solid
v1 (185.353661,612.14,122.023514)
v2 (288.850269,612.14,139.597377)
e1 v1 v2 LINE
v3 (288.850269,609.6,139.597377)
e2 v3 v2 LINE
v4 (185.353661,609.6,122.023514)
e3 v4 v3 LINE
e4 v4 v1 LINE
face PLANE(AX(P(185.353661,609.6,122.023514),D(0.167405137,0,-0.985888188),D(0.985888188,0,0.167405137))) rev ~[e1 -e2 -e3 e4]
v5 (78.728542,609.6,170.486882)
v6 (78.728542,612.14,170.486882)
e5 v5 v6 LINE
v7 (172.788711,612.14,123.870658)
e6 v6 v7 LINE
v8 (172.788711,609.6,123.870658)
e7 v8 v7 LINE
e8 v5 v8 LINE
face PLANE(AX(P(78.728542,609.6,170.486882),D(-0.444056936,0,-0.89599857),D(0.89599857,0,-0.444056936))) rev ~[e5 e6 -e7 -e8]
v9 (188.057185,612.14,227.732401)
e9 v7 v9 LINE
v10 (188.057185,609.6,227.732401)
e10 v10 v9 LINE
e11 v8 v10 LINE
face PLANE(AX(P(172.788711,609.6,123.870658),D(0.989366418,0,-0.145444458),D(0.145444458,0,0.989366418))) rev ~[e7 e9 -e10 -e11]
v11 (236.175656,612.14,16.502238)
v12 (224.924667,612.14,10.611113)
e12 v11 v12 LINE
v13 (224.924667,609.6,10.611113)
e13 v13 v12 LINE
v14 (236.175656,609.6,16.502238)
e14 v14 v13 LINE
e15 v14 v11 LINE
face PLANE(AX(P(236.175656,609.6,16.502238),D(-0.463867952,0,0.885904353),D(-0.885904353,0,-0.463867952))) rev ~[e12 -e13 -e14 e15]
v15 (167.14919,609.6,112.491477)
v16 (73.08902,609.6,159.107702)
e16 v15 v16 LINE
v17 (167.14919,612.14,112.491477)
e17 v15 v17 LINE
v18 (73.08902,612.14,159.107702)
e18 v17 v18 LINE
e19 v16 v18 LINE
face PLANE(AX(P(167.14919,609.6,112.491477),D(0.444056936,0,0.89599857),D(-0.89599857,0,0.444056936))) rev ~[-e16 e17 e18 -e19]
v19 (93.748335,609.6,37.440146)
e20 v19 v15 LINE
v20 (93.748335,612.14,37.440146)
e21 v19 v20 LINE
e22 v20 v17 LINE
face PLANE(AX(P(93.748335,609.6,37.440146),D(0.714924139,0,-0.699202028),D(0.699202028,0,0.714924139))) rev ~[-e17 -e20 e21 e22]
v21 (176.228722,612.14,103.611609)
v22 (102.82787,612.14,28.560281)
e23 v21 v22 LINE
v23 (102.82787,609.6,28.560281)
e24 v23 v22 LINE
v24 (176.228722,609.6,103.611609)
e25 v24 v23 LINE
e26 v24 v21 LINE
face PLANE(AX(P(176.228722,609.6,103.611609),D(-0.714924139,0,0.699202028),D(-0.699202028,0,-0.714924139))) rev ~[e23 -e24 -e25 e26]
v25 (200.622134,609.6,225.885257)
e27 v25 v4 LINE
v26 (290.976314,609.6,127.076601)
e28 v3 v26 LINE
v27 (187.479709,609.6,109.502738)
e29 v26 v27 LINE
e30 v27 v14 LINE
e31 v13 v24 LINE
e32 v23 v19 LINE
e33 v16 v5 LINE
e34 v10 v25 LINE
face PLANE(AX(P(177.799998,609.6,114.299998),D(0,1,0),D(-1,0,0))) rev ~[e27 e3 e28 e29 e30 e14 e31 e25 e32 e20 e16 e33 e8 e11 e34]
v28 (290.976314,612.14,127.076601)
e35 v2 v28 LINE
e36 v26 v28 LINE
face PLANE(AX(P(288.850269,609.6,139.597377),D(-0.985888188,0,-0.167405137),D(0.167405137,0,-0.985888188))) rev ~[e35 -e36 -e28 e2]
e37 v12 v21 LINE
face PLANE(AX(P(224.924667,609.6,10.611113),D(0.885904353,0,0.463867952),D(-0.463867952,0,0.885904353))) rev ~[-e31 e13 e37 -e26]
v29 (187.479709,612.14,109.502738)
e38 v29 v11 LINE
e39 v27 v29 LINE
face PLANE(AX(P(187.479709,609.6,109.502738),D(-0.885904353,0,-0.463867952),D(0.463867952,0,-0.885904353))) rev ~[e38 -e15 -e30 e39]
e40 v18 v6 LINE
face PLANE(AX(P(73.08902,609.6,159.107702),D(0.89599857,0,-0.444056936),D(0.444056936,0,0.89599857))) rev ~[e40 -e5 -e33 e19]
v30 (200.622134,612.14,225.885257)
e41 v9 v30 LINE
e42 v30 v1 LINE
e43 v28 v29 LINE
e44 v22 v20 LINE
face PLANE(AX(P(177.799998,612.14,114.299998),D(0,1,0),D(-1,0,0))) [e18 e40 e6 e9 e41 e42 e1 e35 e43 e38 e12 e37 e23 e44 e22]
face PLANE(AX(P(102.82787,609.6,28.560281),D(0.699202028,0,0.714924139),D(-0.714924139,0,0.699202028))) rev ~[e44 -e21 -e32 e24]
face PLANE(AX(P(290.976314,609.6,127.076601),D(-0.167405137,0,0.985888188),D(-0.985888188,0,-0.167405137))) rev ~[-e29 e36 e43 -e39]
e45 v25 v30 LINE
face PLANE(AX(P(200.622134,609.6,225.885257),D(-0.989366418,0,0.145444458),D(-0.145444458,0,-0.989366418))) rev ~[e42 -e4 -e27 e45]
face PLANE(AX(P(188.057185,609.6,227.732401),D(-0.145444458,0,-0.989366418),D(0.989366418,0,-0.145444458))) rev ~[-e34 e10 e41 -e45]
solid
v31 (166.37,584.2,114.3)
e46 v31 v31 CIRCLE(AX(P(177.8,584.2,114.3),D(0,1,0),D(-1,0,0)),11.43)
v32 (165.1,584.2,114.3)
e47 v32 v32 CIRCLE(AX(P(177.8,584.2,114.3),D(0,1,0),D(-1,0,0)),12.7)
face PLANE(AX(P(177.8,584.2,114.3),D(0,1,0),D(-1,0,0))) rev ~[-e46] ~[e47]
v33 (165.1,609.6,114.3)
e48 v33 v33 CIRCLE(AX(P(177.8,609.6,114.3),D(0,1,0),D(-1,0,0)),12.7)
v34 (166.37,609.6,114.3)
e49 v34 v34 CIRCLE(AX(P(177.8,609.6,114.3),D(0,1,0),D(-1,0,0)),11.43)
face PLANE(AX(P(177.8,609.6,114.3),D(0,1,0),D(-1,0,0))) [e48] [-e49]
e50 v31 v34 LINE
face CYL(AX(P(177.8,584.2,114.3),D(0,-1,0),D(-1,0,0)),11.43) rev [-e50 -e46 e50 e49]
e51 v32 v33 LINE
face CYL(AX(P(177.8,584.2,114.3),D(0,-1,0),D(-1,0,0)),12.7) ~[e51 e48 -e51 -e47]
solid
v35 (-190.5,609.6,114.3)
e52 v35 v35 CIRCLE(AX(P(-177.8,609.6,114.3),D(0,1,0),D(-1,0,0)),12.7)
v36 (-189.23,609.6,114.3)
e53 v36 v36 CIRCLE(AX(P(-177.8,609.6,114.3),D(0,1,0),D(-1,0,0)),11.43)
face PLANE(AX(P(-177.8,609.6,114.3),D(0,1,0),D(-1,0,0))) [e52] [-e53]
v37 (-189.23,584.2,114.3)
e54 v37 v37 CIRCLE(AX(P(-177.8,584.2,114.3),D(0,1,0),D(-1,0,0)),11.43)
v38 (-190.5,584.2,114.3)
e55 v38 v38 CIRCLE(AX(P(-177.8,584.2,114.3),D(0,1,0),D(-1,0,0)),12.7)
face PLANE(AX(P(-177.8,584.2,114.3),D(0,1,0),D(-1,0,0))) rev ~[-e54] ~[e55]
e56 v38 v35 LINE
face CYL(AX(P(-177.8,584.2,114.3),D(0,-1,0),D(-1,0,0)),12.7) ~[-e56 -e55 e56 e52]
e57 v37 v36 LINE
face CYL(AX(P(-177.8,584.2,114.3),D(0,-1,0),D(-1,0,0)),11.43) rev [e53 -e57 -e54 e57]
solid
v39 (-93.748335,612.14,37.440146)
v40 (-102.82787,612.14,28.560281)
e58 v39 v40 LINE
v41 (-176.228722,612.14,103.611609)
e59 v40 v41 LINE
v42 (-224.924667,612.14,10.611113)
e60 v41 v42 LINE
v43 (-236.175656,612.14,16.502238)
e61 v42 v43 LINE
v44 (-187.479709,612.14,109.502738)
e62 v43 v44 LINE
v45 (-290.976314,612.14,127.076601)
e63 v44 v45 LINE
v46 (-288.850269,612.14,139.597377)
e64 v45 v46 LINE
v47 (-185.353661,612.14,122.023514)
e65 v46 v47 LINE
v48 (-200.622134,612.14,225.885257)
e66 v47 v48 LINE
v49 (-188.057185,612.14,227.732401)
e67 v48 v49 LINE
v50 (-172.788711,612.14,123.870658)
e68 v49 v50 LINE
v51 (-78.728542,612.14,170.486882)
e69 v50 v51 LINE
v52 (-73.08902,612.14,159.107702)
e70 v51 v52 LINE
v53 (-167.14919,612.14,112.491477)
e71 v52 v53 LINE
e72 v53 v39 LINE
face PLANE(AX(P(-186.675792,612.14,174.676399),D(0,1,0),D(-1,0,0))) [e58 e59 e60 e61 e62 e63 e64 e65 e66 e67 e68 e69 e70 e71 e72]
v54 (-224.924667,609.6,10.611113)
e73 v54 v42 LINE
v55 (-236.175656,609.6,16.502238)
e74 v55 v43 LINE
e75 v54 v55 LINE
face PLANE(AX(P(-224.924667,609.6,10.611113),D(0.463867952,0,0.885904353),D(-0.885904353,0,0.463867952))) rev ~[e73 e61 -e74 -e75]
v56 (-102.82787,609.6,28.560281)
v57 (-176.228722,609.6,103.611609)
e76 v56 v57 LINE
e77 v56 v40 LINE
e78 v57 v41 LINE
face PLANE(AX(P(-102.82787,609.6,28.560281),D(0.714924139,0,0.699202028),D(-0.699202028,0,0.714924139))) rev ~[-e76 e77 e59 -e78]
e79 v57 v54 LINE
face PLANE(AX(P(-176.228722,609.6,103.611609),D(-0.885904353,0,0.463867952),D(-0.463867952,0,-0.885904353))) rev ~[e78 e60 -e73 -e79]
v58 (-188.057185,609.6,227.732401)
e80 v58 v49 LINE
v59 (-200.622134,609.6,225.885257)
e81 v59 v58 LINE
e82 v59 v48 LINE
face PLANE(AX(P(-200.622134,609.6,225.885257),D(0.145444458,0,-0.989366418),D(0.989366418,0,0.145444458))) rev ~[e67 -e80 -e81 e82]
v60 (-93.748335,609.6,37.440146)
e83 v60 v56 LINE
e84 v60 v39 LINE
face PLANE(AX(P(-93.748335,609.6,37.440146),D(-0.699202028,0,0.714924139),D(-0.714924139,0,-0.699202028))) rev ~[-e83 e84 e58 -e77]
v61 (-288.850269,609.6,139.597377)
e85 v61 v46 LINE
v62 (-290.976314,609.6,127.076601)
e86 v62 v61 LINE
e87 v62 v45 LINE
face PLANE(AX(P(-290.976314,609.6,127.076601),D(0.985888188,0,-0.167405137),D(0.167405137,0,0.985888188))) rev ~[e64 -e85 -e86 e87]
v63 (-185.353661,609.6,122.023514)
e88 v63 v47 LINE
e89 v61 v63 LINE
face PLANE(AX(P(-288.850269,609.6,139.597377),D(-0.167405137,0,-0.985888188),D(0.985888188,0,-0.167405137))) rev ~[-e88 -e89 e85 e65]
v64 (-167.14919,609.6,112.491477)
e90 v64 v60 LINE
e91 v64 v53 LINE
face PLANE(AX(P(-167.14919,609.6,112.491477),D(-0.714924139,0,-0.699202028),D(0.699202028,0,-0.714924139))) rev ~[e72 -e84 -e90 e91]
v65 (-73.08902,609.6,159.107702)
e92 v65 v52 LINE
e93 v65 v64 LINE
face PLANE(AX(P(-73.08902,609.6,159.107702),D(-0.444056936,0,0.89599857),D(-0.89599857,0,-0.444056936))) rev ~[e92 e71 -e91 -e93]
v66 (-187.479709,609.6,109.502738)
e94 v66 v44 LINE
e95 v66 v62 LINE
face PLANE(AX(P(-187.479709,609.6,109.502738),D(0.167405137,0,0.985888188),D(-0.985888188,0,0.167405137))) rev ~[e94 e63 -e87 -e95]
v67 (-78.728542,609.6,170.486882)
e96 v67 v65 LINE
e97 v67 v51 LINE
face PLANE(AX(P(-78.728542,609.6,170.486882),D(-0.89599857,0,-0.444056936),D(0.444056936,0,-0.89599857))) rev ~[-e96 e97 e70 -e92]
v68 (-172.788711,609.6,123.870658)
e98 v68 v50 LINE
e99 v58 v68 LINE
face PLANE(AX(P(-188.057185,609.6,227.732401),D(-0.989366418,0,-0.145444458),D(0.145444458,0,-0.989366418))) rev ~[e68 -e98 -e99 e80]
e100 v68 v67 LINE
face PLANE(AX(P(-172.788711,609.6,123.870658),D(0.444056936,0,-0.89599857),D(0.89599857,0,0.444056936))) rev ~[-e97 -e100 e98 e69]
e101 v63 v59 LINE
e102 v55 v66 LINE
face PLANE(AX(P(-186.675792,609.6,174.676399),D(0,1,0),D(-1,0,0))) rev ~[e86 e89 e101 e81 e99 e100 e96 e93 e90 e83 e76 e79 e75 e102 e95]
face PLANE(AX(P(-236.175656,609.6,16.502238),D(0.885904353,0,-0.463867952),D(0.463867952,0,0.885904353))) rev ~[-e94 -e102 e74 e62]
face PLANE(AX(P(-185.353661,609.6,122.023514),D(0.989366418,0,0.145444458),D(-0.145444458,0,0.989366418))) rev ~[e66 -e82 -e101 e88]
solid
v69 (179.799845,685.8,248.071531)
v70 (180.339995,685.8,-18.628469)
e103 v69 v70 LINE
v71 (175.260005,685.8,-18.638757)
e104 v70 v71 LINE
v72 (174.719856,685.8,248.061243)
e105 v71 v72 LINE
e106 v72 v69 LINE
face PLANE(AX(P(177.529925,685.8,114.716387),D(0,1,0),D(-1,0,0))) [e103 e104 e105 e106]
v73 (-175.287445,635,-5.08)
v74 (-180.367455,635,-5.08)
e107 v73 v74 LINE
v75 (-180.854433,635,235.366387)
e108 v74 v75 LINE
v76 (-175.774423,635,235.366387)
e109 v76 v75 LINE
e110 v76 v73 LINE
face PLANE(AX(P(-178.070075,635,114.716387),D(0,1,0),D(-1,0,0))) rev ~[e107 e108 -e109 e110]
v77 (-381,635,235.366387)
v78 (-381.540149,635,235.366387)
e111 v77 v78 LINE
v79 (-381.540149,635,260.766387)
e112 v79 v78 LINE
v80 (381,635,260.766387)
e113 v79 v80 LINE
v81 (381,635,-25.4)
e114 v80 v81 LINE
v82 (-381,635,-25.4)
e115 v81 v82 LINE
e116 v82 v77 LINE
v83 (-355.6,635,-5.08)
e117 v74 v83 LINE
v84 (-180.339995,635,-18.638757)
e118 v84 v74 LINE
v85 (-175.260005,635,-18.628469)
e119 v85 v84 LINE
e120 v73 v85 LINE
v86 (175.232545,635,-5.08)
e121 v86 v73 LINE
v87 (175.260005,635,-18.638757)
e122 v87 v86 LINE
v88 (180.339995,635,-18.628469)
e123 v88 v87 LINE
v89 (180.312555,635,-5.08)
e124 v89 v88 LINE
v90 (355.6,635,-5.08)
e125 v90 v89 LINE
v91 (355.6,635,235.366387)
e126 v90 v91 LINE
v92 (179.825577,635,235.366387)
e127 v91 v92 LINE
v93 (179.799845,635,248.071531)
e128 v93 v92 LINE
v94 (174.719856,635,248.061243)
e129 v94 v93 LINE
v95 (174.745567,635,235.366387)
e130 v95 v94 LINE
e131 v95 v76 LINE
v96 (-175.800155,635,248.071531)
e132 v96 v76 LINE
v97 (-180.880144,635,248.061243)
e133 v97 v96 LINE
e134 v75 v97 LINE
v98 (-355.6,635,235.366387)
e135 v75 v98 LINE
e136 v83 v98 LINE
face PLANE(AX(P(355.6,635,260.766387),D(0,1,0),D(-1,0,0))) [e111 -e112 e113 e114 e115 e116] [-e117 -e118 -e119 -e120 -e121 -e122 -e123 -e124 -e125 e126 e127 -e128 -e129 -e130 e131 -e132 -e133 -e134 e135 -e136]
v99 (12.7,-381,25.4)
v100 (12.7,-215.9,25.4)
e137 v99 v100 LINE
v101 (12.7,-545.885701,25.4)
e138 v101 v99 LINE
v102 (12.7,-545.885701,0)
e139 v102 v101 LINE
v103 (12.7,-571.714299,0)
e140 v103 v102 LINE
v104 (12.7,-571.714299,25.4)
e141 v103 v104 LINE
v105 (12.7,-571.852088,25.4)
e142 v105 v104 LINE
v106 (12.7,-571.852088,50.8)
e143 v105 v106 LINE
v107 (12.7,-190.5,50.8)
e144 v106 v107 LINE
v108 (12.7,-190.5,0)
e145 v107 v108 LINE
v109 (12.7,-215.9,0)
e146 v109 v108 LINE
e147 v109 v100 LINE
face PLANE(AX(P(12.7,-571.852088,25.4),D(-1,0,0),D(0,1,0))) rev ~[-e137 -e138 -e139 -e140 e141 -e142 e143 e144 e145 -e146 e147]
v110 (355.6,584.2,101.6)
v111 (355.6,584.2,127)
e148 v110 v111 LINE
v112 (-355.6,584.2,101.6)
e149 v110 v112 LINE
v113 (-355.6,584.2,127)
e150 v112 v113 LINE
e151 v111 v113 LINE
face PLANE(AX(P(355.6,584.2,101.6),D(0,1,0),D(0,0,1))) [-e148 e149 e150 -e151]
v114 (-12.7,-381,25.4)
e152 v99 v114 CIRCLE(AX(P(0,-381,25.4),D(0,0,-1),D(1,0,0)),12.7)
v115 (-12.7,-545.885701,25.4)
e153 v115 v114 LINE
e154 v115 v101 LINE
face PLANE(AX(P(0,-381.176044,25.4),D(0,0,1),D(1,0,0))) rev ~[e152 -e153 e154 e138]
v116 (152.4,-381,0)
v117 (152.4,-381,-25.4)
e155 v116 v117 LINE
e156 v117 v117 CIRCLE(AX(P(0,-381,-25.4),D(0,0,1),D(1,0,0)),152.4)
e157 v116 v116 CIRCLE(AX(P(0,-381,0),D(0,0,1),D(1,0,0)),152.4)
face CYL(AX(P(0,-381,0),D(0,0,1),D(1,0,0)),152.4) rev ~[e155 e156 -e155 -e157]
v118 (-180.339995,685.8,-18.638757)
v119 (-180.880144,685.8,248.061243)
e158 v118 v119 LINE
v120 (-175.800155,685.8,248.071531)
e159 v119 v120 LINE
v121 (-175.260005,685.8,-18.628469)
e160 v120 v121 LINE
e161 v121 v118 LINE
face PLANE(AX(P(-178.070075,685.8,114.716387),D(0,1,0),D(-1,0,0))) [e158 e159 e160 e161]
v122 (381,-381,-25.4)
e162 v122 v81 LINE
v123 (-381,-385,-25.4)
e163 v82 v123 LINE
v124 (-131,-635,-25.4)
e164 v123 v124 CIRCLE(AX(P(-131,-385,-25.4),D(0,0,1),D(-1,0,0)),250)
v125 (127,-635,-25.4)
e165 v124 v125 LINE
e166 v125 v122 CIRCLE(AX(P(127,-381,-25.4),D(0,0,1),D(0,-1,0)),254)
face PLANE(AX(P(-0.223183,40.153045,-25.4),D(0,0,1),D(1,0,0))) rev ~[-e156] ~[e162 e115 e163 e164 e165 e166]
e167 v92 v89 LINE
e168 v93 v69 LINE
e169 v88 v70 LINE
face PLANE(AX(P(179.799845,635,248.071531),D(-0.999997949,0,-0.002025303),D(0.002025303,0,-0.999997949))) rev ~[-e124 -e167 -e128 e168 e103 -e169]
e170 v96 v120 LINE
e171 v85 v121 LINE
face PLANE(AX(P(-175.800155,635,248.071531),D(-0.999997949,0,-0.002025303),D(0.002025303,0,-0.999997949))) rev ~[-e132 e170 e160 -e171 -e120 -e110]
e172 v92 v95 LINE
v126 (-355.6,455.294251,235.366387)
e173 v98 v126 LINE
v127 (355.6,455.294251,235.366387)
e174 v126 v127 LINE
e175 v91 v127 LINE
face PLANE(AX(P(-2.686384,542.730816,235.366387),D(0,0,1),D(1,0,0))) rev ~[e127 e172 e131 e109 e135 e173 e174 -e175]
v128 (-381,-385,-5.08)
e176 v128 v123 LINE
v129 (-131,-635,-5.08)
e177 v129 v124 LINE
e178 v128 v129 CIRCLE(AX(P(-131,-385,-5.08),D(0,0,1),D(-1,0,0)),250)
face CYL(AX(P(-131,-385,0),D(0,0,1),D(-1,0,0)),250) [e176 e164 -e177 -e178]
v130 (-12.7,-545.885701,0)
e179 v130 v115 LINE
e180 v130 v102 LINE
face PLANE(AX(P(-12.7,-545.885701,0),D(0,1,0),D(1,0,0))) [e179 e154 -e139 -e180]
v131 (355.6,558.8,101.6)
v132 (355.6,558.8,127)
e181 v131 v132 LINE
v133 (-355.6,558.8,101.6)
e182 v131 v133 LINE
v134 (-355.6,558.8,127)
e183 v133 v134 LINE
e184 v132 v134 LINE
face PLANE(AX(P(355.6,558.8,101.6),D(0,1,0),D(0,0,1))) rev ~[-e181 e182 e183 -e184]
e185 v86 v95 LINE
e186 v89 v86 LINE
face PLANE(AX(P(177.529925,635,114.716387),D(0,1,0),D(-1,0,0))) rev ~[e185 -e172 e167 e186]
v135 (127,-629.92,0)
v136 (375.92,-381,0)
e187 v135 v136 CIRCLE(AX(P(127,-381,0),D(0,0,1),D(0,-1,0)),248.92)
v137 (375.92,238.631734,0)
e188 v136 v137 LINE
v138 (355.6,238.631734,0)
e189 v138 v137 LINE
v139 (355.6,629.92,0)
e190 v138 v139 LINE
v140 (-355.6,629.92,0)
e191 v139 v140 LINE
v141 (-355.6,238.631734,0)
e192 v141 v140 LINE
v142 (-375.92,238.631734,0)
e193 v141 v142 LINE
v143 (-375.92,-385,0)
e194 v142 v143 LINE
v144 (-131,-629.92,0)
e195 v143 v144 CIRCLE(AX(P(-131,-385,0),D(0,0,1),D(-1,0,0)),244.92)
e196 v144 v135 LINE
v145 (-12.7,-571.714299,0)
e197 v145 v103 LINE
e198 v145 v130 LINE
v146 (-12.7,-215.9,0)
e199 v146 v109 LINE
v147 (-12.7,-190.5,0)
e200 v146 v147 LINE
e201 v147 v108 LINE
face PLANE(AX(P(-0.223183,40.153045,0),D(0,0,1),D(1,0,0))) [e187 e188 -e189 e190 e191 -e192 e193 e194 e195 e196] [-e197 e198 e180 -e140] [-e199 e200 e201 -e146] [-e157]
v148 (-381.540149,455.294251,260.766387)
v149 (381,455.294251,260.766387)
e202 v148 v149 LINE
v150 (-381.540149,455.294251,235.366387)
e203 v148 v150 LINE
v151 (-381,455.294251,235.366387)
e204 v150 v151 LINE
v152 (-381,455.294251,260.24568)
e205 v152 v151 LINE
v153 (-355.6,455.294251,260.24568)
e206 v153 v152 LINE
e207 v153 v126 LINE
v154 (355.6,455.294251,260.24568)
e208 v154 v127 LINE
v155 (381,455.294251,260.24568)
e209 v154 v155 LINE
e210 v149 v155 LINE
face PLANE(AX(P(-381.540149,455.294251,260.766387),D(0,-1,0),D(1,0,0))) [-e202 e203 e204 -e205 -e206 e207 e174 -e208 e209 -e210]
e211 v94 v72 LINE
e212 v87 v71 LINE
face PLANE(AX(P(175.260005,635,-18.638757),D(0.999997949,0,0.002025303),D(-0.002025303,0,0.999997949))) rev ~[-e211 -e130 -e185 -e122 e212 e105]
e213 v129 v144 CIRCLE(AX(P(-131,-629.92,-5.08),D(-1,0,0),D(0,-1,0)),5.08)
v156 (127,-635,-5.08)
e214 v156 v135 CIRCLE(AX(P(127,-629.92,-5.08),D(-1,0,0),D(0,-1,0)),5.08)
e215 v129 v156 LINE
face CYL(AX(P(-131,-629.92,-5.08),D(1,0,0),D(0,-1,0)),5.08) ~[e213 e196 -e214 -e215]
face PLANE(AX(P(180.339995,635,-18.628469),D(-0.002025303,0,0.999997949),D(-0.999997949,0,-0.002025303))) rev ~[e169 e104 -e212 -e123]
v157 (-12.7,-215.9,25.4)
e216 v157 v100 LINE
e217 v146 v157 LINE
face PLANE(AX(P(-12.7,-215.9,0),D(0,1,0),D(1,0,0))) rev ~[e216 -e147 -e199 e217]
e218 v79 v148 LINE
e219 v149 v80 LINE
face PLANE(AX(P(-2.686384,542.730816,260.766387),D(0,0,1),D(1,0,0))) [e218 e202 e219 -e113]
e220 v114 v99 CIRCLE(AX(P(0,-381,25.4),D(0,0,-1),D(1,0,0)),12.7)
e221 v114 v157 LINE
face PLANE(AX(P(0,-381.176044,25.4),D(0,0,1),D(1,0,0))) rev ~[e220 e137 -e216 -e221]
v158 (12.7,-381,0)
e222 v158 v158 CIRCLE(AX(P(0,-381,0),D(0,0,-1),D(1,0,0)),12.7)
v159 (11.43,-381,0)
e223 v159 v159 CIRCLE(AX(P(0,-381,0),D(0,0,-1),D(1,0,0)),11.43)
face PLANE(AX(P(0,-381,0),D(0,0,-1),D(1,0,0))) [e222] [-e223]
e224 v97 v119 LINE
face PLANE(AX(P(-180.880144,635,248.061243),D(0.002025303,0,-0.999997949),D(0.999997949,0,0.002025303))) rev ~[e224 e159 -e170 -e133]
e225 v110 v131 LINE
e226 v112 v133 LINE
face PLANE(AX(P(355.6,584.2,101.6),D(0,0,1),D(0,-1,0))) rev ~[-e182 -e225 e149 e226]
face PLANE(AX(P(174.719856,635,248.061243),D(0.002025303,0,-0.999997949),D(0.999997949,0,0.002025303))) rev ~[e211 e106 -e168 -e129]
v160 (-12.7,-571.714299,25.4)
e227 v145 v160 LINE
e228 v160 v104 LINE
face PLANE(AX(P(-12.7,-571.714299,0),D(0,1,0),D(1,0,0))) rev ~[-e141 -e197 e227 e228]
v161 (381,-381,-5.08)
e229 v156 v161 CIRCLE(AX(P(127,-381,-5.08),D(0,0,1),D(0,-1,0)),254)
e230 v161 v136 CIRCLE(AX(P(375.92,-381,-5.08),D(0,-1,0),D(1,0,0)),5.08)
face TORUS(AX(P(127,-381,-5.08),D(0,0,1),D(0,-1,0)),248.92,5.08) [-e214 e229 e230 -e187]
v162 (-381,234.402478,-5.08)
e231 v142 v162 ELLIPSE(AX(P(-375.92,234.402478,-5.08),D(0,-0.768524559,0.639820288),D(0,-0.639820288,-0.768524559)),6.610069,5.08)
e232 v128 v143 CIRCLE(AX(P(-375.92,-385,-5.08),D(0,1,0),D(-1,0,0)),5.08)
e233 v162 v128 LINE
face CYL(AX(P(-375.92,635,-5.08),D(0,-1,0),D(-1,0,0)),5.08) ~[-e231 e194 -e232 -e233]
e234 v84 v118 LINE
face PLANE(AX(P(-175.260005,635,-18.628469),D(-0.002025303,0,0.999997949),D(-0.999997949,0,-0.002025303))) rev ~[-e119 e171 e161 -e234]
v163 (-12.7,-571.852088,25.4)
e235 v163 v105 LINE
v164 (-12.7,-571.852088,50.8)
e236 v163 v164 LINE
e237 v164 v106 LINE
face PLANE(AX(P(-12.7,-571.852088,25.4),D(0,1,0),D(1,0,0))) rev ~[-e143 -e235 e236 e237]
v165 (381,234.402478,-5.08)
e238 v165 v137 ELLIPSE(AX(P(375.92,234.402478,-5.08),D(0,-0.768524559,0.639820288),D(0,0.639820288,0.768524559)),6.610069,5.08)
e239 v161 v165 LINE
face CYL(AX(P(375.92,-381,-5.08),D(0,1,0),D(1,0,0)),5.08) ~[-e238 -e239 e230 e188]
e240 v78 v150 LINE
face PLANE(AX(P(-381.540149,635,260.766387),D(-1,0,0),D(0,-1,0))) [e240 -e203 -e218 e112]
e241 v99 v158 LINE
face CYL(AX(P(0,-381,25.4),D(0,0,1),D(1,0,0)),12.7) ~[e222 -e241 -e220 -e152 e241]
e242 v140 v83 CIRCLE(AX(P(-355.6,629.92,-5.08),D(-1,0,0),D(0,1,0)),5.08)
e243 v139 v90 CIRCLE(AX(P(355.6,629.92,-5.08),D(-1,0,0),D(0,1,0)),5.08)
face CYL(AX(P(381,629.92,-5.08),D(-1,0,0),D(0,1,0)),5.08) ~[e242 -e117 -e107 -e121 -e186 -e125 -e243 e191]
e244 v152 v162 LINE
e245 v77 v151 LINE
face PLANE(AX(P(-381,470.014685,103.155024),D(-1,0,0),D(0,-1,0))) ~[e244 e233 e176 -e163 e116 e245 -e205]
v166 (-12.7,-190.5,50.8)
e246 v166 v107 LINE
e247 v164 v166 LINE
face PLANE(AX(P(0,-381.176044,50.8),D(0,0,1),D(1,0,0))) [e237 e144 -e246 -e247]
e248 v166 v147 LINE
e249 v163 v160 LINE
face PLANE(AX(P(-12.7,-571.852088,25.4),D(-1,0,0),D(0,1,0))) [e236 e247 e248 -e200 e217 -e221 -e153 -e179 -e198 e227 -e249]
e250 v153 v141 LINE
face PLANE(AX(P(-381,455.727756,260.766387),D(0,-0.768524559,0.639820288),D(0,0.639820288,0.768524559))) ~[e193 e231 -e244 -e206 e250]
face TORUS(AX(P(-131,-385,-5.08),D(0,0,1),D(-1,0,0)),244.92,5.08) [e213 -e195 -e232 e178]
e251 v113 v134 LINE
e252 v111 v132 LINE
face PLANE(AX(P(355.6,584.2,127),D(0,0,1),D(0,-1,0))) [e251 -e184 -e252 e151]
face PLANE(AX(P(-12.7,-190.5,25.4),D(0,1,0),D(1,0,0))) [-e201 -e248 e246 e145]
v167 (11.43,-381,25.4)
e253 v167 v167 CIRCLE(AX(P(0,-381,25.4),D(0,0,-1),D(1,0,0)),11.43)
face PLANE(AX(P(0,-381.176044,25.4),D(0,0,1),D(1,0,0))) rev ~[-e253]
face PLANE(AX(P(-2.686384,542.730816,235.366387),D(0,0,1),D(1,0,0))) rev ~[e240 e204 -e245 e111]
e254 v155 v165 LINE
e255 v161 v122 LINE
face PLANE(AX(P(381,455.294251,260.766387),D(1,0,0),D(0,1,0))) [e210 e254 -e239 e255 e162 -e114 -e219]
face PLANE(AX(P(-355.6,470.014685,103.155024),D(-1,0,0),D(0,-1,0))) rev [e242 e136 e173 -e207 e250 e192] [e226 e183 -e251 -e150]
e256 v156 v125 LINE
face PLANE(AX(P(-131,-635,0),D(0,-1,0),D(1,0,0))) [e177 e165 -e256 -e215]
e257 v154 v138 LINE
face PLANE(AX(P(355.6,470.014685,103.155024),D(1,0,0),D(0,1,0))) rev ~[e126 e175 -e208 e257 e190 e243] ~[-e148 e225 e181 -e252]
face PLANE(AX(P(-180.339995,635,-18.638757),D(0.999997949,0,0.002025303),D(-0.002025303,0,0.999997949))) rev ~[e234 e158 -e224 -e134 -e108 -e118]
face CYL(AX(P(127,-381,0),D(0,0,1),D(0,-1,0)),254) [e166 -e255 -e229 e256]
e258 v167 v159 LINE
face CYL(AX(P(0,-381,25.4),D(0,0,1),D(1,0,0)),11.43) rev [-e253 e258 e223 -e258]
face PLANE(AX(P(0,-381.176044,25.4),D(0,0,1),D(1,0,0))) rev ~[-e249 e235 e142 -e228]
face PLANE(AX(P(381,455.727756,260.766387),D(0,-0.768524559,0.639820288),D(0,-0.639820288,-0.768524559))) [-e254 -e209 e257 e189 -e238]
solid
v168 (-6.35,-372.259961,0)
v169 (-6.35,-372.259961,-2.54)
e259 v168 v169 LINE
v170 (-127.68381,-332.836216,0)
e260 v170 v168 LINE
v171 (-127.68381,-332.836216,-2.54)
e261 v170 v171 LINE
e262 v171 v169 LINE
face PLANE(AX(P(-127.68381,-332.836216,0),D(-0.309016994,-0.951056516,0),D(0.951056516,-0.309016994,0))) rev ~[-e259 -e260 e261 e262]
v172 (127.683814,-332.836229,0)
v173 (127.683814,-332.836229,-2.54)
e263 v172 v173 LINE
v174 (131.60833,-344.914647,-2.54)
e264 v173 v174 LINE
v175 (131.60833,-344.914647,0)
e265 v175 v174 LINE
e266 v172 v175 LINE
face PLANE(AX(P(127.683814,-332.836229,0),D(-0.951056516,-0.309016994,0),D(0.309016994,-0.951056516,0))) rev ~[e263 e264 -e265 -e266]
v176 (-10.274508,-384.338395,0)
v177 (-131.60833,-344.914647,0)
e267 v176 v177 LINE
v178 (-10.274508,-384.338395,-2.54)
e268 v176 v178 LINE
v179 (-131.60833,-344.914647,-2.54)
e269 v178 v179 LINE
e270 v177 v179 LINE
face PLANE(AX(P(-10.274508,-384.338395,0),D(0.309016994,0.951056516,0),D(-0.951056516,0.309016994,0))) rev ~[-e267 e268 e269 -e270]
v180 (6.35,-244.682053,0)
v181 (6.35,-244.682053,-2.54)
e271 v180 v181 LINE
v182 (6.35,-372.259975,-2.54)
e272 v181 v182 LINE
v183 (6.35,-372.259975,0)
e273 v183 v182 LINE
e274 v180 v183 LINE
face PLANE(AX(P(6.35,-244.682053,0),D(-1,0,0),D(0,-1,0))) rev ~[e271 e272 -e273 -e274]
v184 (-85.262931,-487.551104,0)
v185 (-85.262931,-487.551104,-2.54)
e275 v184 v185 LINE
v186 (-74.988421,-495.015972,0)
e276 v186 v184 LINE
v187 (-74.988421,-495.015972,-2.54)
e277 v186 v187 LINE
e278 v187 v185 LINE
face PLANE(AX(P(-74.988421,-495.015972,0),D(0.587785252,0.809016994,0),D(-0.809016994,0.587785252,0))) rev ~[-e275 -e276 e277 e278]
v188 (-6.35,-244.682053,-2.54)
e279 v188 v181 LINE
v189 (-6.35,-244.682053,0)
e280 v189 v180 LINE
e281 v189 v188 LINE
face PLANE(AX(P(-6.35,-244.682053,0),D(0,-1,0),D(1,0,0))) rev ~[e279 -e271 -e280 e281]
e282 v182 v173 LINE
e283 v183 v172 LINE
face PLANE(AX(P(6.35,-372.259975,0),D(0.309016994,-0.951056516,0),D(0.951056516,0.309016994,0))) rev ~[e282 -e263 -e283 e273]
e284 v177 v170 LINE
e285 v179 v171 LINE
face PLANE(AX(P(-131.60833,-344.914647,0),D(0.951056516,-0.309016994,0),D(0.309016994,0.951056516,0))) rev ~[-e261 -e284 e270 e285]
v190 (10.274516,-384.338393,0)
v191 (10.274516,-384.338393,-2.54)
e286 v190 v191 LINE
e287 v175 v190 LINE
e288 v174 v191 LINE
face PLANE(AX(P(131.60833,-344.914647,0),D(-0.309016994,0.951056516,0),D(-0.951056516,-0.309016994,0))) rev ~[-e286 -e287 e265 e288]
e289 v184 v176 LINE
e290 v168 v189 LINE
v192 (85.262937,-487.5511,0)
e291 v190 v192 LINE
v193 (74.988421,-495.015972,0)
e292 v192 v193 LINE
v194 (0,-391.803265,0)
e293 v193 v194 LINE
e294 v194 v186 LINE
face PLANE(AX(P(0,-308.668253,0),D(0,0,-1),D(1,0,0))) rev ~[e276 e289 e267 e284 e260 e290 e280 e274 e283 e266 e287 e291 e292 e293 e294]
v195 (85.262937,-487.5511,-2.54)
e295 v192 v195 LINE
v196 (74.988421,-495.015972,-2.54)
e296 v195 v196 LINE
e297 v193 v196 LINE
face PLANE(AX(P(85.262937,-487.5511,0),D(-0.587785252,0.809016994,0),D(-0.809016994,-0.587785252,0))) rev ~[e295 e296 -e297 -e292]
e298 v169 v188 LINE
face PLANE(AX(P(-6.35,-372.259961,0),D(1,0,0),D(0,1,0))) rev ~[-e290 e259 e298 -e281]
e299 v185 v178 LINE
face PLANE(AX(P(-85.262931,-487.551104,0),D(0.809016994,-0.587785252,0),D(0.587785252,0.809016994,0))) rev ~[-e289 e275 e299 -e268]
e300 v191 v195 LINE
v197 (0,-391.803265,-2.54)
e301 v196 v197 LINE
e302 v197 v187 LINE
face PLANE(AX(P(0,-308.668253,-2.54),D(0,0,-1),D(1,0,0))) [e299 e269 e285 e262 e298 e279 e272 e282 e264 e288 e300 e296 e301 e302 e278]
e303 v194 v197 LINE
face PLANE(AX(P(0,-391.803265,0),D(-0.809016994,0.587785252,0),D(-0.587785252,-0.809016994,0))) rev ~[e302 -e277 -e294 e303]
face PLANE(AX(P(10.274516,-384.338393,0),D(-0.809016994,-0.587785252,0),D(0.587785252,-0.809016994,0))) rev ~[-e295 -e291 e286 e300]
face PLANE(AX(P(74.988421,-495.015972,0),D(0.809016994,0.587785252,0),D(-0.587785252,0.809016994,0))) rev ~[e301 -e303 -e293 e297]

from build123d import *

# Parameters (mm, degrees)
F0_R      = 152.4
F1_DEPTH  = 25.4
F2_R      = 5.08
F3_W      = 25.4
F3_H      = 25.4
F3_H_2    = 25.8285974579
F4_DEPTH  = 25.4
F5_W      = 25.4
F5_H      = 381.3520879745
F6_DEPTH  = 25.4
F8_DEPTH  = 25.4
F11_DEPTH = 25.4
F12_W     = 25.4
F12_H     = 25.4
F13_DEPTH = 711.2
F14_R     = 12.7
F14_R_2   = 11.43
F15_DEPTH = 25.4
F17_DEPTH = 2.54
F19_DEPTH = 50.8
F20_R     = 12.7
F20_R_2   = 11.43
F21_DEPTH = 25.4
F23_DEPTH = 2.54


# Not quite as in the source:
# - the program builds the solid bodies; features that only make, move or delete a surface that nothing else refers to are left out


with BuildPart() as f1:
    # F0 (on Top) → F1 (new body)
    with BuildSketch(Plane.XY):
        with BuildLine():
            Line((381, 635), (-381, 635))
            Line((-381, 635), (-381, -385))
            ThreePointArc((-381, -385), (-307.7766952966, -561.7766952966), (-131, -635))
            Line((-131, -635), (127, -635))
            ThreePointArc((127, -635), (306.6051224214, -560.6051224214), (381, -381))
            Line((381, -381), (381, 635))
        make_face()
        with Locations((0, -381)):
            Circle(F0_R, mode=Mode.SUBTRACT)
    extrude(amount=-F1_DEPTH)

    # F2
    f2_edges = [f1.edges().sort_by_distance(p)[0] for p in [
        (-381, 125, 0),
        (-307.776695, -561.776695, 0),
        (-2, -635, 0),
        (306.605122, -560.605122, 0),
        (381, 127, 0),
        (0, 635, 0),
    ]]
    fillet(f2_edges, radius=F2_R)

    # F3 (on face) → F4 (join)
    with BuildSketch(Plane.XY):
        with Locations((0, -203.2)):
            Rectangle(F3_W, F3_H)
        with Locations((0, -558.8)):
            Rectangle(F3_W, F3_H_2)
    extrude(amount=F4_DEPTH)

    # F5 (on face) → F6 (join)
    with BuildSketch(Plane.XY.offset(25.4)):
        with Locations((0, -381.1760439873)):
            Rectangle(F5_W, F5_H)
    extrude(amount=F6_DEPTH)

    # F9: F8 across plane


with BuildPart() as f8:
    # F7 (on face) → F8 (new body)
    with BuildSketch(Plane.YZ.offset(381)):
        Polygon((234.4024777412, -5.08), (635, -5.08), (635, 260.7663869858), (455.7277560234, 260.7663869858), align=None)
    extrude(amount=-F8_DEPTH)


with BuildPart() as f1_1:
    add(f1.part)
    add(f8.part.mirror(Plane.YZ))


    add(f8.part)  # F11 merges F8
    # F10 (on face) → F11 (join)
    with BuildSketch(Plane.XY.offset(260.7663869858)):
        Polygon((355.6, 455.7277560234), (355.6, 635), (-381.5401494503, 635), (-381.5401494503, 455.294251442), (381, 455.294251442), (381, 455.7277560234), align=None)
    extrude(amount=-F11_DEPTH)

    # F12 (on face) → F13 (join, through all)
    with BuildSketch(Plane(origin=(355.6, 0, 0), x_dir=(0, -1, 0), z_dir=(-1, 0, 0))):
        with Locations((-571.5, 114.3)):
            Rectangle(F12_W, F12_H)
    extrude(amount=F13_DEPTH)

    # F18 (on face) → F19 (join)
    with BuildSketch(Plane(origin=(0, 635, 0), x_dir=(-1, 0, 0), z_dir=(0, 1, 0))):
        Polygon((-180.3399947906, -18.6284687443), (-175.2600052094, -18.6387572841), (-174.7198557591, 248.0612427159), (-179.7998453403, 248.0715312557), align=None)
        Polygon((180.8801442409, 248.0612427159), (175.8001546597, 248.0715312557), (175.2600052094, -18.6284687443), (180.3399947906, -18.6387572841), align=None)
    extrude(amount=F19_DEPTH)

    # F20 (on face) → F21 (join)
    with BuildSketch(Plane(origin=(0, 0, 25.4), x_dir=(1, 0, 0), z_dir=(0, 0, -1))):
        with Locations((0, 381)):
            Circle(F20_R)
        with Locations((0, 381)):
            Circle(F20_R_2, mode=Mode.SUBTRACT)
    extrude(amount=F21_DEPTH)


with BuildPart() as f15:
    # F14 (on face) → F15 (new body)
    with BuildSketch(Plane(origin=(0, 584.2, 0), x_dir=(-1, 0, 0), z_dir=(0, 1, 0))):
        with Locations((-177.8, 114.3)):
            Circle(F14_R)
        with Locations((-177.8, 114.3)):
            Circle(F14_R_2, mode=Mode.SUBTRACT)
    extrude(amount=F15_DEPTH)


with BuildPart() as f15b:
    # F14 (on face) → F15, piece 2 (new body)
    with BuildSketch(Plane(origin=(0, 584.2, 0), x_dir=(-1, 0, 0), z_dir=(0, 1, 0))):
        with Locations((177.8, 114.3)):
            Circle(F14_R)
        with Locations((177.8, 114.3)):
            Circle(F14_R_2, mode=Mode.SUBTRACT)
    extrude(amount=F15_DEPTH)


with BuildPart() as f17:
    # F16 (on face) → F17 (new body)
    with BuildSketch(Plane(origin=(0, 609.6, 0), x_dir=(-1, 0, 0), z_dir=(0, 1, 0))):
        Polygon((-176.2287217864, 103.6116089142), (-173.1315717637, 109.5266083861), (-167.1491895745, 112.4914773008), (-171.8176097634, 117.2648706101), (-172.7887111674, 123.8706576668), (-178.771098065, 120.9057864186), (-185.3536605461, 122.0235143615), (-184.382560212, 115.4177345825), (-187.4797086447, 109.5027381472), (-180.8971505009, 108.3850109408), align=None)
        Polygon((-167.1491895745, 112.4914773008), (-173.1315717637, 109.5266083861), (-176.2287217864, 103.6116089142), (-102.8278704973, 28.560281428), (-93.7483348442, 37.4401462961), align=None)
        Polygon((-171.8176097634, 117.2648706101), (-167.1491895745, 112.4914773008), (-73.089019826, 159.1077021724), (-78.7285420374, 170.4868822318), (-172.7887111674, 123.8706576668), align=None)
        Polygon((-224.9246668441, 10.6111125903), (-176.2287217864, 103.6116089142), (-180.8971505009, 108.3850109408), (-187.4797086447, 109.5027381472), (-236.1756559324, 16.5022375643), align=None)
        Polygon((-178.771098065, 120.9057864186), (-172.7887111674, 123.8706576668), (-188.0571847598, 227.7324014723), (-200.6221340373, 225.8852574787), (-185.3536605461, 122.0235143615), align=None)
        Polygon((-290.976313686, 127.0766005719), (-187.4797086447, 109.5027381472), (-184.382560212, 115.4177345825), (-185.3536605461, 122.0235143615), (-288.8502689845, 139.597377363), align=None)
    extrude(amount=F17_DEPTH)


with BuildPart() as f17b:
    # F16 (on face) → F17, piece 2 (new body)
    with BuildSketch(Plane(origin=(0, 609.6, 0), x_dir=(-1, 0, 0), z_dir=(0, 1, 0))):
        Polygon((172.7887111674, 123.8706576668), (178.771098065, 120.9057864186), (185.3536605461, 122.0235143615), (200.6221340373, 225.8852574787), (188.0571847598, 227.7324014723), align=None)
        Polygon((185.3536605461, 122.0235143615), (178.771098065, 120.9057864186), (172.7887111674, 123.8706576668), (171.8176097634, 117.2648706101), (167.1491895745, 112.4914773008), (173.1315717637, 109.5266083861), (176.2287217864, 103.6116089142), (180.8971505009, 108.3850109408), (187.4797086447, 109.5027381472), (184.382560212, 115.4177345825), align=None)
        Polygon((288.8502689845, 139.597377363), (185.3536605461, 122.0235143615), (184.382560212, 115.4177345825), (187.4797086447, 109.5027381472), (290.976313686, 127.0766005719), align=None)
        Polygon((171.8176097634, 117.2648706101), (172.7887111674, 123.8706576668), (78.7285420374, 170.4868822318), (73.089019826, 159.1077021724), (167.1491895745, 112.4914773008), align=None)
        Polygon((236.1756559324, 16.5022375643), (187.4797086447, 109.5027381472), (180.8971505009, 108.3850109408), (176.2287217864, 103.6116089142), (224.9246668441, 10.6111125903), align=None)
        Polygon((173.1315717637, 109.5266083861), (167.1491895745, 112.4914773008), (93.7483348442, 37.4401462961), (102.8278704973, 28.560281428), (176.2287217864, 103.6116089142), align=None)
    extrude(amount=F17_DEPTH)


with BuildPart() as f23:
    # F22 (on face) → F23 (new body)
    with BuildSketch(Plane(origin=(0, 0, 0), x_dir=(1, 0, 0), z_dir=(0, 0, -1))):
        Polygon((6.3499999233, 372.2599748299), (2.16544e-05, 374.3232078401), (-6.35, 372.2599607331), (-6.35, 244.6820527577), (6.3499999233, 244.6820527577), align=None)
        Polygon((-6.35, 372.2599607331), (2.16544e-05, 374.3232078401), (6.3499999233, 372.2599748299), (6.3499999233, 378.9367598233), (10.2745163884, 384.3383933324), (3.9245149228, 386.4016338797), (5.85e-08, 391.8032651855), (-3.9245156754, 386.4016326828), (-10.2745080358, 384.338395094), (-6.35, 378.9367731868), align=None)
        Polygon((-127.6838099629, 332.8362160572), (-6.35, 372.2599607331), (-6.35, 378.9367731868), (-10.2745080358, 384.338395094), (-131.6083299271, 344.9146465423), align=None)
        Polygon((6.3499999233, 378.9367598233), (6.3499999233, 372.2599748299), (127.6838140985, 332.8362287853), (131.608330207, 344.9146474037), (10.2745163884, 384.3383933324), align=None)
        Polygon((-85.2629306216, 487.5511041858), (-10.2745080358, 384.338395094), (-3.9245156754, 386.4016326828), (5.85e-08, 391.8032651855), (-74.9884210975, 495.0159723094), align=None)
        Polygon((3.9245149228, 386.4016338797), (10.2745163884, 384.3383933324), (85.2629369261, 487.5510996053), (74.9884211741, 495.0159722538), (5.85e-08, 391.8032651855), align=None)
    extrude(amount=F23_DEPTH)


solid = Compound([f1_1.part, f15.part, f15b.part, f17.part, f17b.part, f23.part])
